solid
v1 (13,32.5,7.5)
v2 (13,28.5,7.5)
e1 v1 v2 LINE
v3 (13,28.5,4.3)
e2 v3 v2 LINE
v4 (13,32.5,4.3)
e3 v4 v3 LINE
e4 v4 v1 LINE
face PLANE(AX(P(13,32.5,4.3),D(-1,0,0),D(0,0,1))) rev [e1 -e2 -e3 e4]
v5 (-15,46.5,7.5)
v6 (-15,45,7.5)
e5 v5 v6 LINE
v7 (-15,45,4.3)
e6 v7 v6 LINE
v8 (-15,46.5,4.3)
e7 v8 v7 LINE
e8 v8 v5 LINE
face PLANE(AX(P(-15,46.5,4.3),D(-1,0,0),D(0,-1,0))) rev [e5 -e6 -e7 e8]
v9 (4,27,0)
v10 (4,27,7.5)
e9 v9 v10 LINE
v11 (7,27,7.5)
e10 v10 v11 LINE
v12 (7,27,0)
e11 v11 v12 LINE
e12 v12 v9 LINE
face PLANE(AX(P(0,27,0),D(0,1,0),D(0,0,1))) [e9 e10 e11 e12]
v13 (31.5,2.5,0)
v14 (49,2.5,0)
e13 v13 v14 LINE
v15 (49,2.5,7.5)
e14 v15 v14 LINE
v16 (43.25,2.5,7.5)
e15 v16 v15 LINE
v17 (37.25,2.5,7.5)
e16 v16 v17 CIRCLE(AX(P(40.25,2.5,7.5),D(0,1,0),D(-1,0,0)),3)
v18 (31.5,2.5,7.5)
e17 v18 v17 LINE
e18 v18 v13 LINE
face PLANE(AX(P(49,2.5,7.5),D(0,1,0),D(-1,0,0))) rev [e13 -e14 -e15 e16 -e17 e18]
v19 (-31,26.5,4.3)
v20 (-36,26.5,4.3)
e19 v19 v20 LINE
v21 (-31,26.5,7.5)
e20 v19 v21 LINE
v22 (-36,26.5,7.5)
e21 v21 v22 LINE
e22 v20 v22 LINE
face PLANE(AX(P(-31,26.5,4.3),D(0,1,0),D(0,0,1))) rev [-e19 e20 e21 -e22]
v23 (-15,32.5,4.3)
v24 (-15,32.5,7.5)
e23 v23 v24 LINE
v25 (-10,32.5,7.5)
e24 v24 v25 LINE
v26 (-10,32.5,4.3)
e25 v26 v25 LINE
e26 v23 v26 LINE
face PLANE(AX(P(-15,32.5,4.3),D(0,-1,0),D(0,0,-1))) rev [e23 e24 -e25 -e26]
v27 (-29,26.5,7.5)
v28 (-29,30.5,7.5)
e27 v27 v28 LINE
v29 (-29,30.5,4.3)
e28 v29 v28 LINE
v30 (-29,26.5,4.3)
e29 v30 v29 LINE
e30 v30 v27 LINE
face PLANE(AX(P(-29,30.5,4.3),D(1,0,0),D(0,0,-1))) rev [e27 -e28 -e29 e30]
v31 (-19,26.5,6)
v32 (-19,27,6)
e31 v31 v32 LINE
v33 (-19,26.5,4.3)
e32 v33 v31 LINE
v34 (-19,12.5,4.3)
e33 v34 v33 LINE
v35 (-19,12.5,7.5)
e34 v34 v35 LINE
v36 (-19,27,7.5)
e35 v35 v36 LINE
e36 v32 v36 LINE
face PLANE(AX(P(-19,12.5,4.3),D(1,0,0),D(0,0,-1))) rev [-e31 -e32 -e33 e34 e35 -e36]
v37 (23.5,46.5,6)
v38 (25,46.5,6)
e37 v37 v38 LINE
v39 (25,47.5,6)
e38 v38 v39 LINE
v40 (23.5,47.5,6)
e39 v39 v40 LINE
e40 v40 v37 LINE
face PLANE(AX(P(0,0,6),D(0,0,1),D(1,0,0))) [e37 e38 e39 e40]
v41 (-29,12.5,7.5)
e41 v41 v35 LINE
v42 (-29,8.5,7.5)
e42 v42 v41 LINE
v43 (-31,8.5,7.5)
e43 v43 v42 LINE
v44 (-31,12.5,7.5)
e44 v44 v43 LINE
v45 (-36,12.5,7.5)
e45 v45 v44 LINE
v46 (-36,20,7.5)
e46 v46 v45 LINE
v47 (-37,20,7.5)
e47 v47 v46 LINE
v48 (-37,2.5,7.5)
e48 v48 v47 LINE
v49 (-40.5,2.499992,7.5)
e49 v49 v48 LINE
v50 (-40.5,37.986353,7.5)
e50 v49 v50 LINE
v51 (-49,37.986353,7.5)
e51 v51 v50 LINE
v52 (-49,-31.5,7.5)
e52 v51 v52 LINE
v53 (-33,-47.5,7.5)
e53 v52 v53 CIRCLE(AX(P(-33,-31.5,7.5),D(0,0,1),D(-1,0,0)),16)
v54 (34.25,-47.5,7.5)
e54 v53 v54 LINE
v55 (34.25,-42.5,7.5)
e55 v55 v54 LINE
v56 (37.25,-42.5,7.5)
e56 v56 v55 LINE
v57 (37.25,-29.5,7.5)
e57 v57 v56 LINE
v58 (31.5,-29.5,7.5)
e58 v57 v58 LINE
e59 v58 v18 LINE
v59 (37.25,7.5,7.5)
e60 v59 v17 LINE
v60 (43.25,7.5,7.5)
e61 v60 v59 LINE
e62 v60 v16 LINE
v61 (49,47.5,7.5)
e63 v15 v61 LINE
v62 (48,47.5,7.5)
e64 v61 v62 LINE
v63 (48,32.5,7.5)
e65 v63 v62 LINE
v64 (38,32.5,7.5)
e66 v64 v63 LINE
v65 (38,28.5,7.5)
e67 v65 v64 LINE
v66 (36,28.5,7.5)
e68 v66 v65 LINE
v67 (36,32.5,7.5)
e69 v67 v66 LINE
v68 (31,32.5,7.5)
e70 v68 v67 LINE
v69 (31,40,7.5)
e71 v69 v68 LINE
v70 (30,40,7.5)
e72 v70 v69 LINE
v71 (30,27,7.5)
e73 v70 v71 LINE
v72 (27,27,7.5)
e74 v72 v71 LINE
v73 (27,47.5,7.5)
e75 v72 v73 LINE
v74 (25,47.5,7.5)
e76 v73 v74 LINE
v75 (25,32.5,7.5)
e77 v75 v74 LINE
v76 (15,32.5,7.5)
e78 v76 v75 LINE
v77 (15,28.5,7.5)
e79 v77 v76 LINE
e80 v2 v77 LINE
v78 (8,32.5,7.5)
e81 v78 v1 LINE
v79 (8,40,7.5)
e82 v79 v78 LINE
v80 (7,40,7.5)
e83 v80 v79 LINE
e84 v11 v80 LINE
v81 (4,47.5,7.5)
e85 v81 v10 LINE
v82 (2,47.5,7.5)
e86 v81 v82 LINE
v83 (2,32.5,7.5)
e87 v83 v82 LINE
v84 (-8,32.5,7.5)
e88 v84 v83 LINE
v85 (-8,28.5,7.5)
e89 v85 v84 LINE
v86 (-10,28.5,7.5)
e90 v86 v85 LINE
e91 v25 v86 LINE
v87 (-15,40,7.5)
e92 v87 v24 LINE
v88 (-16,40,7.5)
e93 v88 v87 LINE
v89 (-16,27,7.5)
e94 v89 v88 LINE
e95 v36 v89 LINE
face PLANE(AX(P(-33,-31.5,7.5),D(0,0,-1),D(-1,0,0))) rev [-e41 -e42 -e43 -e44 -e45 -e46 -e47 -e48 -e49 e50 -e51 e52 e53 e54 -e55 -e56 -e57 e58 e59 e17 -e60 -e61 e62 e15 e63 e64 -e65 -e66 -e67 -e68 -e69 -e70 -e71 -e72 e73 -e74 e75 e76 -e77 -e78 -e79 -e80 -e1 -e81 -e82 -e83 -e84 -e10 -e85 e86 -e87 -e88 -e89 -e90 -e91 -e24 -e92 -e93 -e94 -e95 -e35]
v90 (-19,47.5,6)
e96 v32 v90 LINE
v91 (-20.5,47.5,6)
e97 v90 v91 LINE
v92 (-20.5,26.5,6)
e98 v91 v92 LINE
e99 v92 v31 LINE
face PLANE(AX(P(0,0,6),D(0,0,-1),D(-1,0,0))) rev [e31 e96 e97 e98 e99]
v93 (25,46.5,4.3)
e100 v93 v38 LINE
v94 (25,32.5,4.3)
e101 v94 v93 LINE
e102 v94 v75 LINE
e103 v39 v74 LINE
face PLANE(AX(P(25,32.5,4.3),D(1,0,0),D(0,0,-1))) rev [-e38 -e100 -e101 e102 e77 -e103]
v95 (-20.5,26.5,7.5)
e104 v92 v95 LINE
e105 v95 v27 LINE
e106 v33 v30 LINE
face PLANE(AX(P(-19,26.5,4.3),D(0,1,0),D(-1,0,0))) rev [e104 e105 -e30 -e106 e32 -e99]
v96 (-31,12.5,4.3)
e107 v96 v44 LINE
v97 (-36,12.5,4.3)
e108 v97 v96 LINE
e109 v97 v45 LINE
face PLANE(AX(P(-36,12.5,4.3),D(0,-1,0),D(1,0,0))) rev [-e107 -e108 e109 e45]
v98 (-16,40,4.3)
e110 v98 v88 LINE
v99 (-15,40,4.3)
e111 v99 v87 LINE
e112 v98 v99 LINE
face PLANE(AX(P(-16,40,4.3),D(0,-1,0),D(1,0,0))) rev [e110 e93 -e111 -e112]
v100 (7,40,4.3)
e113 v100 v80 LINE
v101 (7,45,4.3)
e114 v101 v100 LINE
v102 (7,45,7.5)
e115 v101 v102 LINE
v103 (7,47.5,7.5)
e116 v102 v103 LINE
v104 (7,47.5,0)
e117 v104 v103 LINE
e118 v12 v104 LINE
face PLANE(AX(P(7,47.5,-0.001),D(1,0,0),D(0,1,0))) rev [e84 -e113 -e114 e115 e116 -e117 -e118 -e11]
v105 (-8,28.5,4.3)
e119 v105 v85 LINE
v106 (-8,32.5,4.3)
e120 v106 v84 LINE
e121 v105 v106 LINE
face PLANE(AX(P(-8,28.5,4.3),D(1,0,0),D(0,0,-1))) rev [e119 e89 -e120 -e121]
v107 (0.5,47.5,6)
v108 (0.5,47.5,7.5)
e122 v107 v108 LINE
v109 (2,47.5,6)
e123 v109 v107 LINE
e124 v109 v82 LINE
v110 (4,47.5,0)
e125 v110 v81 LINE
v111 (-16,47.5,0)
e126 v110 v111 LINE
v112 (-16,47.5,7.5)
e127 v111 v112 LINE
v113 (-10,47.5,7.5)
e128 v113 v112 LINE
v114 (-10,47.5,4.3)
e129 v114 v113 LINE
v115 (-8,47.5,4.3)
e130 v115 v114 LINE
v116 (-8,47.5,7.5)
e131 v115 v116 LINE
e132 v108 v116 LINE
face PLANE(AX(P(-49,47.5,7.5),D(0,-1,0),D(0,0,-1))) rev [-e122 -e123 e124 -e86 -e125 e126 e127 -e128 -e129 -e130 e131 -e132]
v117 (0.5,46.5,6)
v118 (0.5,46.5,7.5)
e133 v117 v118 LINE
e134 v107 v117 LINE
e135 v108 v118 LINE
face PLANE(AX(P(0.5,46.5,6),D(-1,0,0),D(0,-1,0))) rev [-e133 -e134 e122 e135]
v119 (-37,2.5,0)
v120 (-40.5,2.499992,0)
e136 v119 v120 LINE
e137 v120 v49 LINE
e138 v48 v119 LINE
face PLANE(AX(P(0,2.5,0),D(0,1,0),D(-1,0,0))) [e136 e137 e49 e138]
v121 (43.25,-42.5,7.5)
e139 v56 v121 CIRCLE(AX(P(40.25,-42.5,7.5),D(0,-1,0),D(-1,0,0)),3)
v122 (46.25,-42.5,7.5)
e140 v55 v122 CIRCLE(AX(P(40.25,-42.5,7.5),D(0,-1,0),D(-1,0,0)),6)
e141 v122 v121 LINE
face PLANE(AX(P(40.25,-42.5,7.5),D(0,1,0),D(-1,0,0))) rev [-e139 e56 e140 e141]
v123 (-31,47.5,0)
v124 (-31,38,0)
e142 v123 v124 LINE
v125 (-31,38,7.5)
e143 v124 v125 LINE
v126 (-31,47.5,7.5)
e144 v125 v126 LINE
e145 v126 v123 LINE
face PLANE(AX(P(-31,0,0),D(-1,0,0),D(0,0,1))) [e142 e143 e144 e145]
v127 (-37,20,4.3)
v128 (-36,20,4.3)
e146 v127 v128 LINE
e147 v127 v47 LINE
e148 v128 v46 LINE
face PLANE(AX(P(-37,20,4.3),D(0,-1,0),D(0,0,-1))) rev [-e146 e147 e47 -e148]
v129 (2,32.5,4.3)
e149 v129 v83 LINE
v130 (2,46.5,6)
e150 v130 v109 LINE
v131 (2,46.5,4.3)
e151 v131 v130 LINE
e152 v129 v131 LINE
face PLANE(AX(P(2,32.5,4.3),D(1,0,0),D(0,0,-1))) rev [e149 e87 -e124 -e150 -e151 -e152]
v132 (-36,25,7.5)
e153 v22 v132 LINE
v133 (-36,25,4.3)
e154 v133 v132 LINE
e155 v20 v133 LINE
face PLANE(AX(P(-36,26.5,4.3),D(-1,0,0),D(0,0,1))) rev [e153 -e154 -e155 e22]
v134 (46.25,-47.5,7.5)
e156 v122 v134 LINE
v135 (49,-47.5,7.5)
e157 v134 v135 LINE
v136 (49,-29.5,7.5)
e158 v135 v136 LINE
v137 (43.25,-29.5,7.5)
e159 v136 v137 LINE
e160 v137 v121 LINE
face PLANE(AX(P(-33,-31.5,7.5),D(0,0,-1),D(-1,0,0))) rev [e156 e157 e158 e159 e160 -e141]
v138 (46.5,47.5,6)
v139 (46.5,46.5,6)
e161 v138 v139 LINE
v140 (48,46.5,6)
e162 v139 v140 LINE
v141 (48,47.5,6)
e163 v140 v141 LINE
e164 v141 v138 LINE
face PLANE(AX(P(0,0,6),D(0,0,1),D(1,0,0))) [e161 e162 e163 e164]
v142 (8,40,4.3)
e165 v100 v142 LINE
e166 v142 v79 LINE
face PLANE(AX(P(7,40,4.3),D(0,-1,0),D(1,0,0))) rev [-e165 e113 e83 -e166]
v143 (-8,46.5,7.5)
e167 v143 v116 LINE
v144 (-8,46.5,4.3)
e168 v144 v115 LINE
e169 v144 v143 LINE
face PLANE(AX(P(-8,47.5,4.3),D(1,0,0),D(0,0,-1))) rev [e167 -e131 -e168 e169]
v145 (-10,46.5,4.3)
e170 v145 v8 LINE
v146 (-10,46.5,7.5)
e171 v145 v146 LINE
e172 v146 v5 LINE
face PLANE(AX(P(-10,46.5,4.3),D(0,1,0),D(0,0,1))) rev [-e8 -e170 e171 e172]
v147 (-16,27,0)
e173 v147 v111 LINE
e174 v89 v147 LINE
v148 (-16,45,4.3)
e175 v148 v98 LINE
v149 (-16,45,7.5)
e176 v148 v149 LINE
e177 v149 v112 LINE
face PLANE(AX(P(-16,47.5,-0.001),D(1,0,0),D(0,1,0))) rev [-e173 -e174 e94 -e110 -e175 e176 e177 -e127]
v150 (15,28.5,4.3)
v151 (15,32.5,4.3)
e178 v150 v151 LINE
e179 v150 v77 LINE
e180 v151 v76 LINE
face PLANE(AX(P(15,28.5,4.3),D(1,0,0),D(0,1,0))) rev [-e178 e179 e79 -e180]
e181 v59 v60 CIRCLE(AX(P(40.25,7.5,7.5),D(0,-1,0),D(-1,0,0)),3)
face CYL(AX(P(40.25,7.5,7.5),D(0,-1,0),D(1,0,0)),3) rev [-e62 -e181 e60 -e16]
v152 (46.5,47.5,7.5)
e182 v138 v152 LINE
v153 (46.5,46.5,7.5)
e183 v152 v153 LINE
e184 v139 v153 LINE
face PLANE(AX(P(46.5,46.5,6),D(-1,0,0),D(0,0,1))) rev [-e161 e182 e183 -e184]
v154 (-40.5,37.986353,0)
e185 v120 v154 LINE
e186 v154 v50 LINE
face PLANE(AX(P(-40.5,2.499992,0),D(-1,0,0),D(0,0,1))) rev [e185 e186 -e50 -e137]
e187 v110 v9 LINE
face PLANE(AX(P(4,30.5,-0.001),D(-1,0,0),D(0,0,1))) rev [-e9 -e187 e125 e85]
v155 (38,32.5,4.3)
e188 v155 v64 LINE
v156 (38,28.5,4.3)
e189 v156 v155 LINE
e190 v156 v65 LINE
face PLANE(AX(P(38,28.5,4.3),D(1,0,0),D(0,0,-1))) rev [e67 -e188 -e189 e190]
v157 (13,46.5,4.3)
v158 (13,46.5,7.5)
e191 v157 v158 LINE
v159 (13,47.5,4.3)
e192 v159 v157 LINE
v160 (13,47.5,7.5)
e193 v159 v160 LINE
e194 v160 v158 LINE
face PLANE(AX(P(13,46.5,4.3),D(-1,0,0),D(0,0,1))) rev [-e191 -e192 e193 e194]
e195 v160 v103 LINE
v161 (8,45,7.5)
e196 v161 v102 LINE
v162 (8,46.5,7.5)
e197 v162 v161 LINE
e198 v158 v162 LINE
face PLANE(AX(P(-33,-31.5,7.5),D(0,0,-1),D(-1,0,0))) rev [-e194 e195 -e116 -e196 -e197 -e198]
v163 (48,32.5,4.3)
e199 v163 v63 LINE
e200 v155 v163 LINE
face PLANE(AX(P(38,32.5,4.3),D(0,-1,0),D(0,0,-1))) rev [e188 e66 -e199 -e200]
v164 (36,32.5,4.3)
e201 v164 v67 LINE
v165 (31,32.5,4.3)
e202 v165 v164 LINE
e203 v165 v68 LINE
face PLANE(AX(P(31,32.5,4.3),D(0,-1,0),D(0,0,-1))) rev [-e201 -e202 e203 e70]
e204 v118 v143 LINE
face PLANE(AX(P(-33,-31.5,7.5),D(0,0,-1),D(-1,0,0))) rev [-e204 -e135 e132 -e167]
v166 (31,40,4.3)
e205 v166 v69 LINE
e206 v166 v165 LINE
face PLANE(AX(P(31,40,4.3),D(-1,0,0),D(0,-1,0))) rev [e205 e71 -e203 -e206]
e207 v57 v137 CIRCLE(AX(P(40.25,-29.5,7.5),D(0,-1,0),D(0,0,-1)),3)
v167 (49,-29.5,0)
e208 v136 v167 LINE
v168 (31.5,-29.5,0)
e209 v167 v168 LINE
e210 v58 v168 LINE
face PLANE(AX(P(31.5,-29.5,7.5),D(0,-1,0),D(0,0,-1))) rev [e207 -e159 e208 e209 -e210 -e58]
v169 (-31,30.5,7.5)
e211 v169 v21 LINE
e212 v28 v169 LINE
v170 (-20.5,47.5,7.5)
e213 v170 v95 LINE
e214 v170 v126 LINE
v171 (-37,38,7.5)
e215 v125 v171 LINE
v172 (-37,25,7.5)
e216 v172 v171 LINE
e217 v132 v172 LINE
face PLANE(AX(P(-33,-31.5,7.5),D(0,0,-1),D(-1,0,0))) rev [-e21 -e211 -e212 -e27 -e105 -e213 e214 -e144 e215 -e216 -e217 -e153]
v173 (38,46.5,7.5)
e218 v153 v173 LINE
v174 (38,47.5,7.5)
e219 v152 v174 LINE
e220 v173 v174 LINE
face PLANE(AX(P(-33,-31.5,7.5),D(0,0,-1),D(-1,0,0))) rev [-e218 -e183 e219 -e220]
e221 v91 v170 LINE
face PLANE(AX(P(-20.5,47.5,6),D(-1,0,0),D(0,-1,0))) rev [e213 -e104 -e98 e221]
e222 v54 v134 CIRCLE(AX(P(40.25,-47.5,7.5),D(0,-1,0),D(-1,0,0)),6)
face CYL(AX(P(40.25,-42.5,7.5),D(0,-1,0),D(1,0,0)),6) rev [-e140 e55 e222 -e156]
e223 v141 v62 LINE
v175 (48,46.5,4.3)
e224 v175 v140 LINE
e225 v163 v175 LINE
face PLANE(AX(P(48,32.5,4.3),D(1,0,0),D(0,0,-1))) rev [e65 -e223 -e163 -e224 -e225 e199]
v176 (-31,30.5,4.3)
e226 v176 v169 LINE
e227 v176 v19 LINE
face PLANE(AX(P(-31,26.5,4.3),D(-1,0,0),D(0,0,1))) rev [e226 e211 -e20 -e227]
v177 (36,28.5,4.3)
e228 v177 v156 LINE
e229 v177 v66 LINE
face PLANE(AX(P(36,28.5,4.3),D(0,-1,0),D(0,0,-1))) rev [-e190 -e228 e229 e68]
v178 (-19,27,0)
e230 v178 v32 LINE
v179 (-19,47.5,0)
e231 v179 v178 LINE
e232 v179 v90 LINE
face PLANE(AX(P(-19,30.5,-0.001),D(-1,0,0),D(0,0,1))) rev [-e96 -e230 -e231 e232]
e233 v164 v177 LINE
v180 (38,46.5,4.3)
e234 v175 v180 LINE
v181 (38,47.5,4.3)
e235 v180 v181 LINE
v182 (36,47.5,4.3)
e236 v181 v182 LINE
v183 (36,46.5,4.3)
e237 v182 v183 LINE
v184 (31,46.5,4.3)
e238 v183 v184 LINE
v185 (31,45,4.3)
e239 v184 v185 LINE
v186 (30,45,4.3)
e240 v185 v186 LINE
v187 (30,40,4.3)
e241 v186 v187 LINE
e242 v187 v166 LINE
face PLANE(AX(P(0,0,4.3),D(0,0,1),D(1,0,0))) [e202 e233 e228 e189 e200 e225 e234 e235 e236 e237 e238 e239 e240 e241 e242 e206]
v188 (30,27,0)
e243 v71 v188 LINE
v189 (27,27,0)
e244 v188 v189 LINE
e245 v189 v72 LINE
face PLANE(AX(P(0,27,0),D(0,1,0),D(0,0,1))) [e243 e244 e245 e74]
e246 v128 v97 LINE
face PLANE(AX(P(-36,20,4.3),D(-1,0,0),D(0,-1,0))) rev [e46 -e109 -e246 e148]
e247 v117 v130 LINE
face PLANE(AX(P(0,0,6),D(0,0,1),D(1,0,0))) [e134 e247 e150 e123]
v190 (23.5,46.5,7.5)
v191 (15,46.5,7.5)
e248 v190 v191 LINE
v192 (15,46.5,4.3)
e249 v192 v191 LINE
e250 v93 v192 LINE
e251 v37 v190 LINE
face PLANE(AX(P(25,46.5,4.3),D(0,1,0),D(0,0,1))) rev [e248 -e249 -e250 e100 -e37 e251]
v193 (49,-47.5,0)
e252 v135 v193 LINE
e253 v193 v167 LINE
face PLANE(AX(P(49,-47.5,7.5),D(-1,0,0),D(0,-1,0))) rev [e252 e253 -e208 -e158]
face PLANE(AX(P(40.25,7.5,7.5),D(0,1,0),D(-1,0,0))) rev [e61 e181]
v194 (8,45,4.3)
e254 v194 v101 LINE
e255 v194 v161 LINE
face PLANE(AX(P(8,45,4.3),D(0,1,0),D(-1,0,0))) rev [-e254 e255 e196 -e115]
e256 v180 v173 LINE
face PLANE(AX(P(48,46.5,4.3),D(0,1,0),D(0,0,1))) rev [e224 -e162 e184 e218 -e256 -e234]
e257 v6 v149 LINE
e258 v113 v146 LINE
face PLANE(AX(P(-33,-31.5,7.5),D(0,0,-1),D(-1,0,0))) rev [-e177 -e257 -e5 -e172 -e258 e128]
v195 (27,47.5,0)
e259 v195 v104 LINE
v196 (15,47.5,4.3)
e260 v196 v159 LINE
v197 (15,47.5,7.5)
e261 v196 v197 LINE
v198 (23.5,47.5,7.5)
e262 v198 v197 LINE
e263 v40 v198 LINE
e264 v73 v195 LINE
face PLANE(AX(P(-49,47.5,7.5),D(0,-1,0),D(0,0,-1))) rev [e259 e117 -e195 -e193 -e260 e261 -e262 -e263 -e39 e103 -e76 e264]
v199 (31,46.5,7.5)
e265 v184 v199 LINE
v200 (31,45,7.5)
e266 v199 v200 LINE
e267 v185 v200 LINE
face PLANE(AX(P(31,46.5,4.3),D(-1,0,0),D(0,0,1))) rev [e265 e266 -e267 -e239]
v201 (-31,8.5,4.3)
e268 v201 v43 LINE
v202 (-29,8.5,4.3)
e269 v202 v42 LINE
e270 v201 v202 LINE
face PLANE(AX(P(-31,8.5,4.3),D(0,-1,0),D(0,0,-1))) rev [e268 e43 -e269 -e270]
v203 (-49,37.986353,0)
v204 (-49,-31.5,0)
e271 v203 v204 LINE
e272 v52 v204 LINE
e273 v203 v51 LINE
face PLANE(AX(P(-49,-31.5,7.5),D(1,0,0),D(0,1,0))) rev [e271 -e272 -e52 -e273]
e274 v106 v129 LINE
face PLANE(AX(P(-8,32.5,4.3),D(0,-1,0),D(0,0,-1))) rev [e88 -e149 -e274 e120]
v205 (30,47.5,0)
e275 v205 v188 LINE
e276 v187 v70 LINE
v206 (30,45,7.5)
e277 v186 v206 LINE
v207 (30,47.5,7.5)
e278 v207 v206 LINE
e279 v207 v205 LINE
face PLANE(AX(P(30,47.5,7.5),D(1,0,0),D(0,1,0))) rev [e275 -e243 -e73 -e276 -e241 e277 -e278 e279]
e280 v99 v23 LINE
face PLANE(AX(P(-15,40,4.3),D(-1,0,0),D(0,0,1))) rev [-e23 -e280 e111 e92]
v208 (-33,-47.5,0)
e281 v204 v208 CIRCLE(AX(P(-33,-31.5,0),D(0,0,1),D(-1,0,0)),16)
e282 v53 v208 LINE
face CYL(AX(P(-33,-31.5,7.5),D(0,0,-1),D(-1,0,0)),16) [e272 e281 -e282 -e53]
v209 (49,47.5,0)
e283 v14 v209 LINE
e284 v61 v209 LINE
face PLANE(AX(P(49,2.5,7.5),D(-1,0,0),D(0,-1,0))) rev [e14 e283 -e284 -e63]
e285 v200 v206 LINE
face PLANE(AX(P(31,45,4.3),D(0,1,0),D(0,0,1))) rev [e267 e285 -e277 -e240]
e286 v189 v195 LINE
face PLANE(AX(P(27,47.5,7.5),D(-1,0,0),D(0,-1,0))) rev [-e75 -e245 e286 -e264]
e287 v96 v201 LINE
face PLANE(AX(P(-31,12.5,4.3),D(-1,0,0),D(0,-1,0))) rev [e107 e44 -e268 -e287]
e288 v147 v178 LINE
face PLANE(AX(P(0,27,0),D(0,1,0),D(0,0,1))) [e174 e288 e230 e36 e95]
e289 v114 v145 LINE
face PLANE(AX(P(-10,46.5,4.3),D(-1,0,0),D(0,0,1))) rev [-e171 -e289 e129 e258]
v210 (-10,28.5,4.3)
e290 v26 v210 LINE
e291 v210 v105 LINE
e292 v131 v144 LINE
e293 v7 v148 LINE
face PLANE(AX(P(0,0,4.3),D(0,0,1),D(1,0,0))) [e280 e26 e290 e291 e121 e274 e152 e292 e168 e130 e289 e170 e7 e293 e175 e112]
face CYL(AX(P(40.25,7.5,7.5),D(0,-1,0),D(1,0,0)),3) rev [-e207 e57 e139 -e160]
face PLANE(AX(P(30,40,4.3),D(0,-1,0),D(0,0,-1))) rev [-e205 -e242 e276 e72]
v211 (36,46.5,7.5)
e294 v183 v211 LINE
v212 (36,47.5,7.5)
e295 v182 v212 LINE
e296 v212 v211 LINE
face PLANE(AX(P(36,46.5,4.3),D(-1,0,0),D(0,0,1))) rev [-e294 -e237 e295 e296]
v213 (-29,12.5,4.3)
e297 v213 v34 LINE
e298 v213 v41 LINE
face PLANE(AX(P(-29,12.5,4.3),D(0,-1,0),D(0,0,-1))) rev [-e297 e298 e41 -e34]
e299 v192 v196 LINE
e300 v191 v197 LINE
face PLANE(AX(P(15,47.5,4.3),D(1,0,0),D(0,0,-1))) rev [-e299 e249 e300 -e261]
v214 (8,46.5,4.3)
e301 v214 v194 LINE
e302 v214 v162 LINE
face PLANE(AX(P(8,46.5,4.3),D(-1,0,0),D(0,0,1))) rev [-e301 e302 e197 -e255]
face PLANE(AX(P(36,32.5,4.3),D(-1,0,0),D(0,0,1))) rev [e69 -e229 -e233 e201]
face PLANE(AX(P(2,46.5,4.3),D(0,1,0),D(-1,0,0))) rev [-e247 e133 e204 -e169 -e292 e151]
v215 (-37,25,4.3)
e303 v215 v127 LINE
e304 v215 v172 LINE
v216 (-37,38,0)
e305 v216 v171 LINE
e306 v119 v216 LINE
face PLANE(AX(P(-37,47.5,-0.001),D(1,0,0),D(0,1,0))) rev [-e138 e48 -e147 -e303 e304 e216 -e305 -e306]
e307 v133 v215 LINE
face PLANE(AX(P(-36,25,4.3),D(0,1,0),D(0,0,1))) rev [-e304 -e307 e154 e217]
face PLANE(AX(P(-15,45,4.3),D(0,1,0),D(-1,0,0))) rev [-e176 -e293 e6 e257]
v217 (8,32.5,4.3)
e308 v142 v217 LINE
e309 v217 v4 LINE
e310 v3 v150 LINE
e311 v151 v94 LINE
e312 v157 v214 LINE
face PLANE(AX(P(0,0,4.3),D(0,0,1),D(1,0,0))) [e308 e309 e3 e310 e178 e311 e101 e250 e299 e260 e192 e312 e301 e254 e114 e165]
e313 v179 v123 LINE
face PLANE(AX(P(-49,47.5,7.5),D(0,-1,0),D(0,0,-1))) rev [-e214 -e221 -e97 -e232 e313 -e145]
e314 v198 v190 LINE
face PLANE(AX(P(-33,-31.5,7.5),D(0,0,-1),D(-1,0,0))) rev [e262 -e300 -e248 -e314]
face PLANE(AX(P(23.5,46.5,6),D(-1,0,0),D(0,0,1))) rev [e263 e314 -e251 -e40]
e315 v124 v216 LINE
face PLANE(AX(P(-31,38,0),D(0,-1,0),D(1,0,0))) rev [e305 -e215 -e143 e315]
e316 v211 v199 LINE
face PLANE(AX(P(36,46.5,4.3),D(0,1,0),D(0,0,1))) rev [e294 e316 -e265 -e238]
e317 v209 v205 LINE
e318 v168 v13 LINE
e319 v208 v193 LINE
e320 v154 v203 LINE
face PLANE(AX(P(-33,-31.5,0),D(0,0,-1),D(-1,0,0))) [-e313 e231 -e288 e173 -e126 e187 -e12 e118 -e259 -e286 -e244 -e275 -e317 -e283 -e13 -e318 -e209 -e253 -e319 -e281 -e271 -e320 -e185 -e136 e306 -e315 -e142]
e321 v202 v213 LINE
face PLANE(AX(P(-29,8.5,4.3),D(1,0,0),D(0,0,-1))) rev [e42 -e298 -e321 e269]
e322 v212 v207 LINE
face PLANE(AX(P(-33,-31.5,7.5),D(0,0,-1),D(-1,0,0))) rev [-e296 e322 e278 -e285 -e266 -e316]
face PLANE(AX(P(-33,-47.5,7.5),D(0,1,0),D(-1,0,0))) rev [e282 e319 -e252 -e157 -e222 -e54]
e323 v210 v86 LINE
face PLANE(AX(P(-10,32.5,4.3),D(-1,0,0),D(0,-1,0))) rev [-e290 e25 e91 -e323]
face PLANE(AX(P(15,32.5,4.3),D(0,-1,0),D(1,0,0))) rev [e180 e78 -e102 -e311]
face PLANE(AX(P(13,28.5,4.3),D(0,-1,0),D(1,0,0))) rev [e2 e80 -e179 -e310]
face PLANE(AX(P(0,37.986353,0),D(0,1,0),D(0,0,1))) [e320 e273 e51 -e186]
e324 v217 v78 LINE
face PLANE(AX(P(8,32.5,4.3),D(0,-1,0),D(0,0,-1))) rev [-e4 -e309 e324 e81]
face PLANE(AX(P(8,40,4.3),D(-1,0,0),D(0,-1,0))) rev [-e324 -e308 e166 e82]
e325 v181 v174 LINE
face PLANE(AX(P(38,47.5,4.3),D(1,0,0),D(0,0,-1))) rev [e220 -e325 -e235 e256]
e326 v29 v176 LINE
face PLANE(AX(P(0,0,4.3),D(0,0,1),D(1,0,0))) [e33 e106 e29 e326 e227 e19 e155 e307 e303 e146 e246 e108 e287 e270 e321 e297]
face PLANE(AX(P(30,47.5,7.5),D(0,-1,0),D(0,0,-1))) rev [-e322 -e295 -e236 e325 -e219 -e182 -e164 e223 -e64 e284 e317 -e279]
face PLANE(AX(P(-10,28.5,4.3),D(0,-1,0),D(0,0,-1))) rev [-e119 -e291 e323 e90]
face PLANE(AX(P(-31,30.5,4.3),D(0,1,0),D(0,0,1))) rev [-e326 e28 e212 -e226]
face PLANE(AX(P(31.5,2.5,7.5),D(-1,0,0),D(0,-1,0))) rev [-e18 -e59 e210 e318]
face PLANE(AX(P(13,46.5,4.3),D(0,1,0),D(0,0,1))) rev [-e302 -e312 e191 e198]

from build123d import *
from OCP.BRepAlgoAPI import BRepAlgoAPI_Cut
from OCP.TopTools import TopTools_ListOfShape

# Parameters (mm, degrees)
BOSS_EXTRUDE1_DEPTH = 7.5
CUT_EXTRUDE1_DEPTH  = 3.2
CUT_EXTRUDE2_DEPTH  = 5
CUT_EXTRUDE3_DEPTH  = 50
CUT_EXTRUDE4_REACH  = 70.655
SKETCH5_W           = 3
SKETCH5_H           = 17
CUT_EXTRUDE5_REACH  = 70.655
SKETCH8_W           = 12
SKETCH8_H           = 37
CUT_EXTRUDE6_DEPTH  = 3.2
SKETCH10_W          = 10
SKETCH10_H          = 7.5
BOSS_EXTRUDE2_DEPTH = 27.486353186
SKETCH11_W          = 3
SKETCH11_H          = 7.5
CUT_EXTRUDE7_DEPTH  = 3.5
SKETCH12_W          = 2
SKETCH12_H          = 7.5
CUT_EXTRUDE8_DEPTH  = 4
SKETCH13_W          = 2
SKETCH13_H          = 7.5
CUT_EXTRUDE9_DEPTH  = 4
SKETCH14_W          = 7.5
SKETCH14_H          = 9.5
CUT_EXTRUDE10_DEPTH = 6
SKETCH15_W          = 1.5
SKETCH15_H          = 21
SKETCH15_H_2        = 1
CUT_EXTRUDE11_DEPTH = 1.5
SKETCH16_W          = 1.5
SKETCH16_H          = 7.5
CUT_EXTRUDE12_DEPTH = 35.486360958


with BuildPart() as part:
    # Sketch1 → Boss-Extrude1 (new body)
    with BuildSketch(Plane.XY):
        with BuildLine():
            Line((-33, -47.5), (49, -47.5))
            Line((49, -47.5), (49, -29.5))
            Line((49, -29.5), (31.5, -29.5))
            Line((31.5, -29.5), (31.5, 2.5))
            Line((31.5, 2.5), (49, 2.5))
            Line((49, 2.5), (49, 47.5))
            Line((49, 47.5), (30, 47.5))
            Line((30, 47.5), (30, 30.5))
            Line((30, 30.5), (27, 30.5))
            Line((27, 30.5), (27, 47.5))
            Line((27, 47.5), (-49, 47.5))
            Line((-49, 47.5), (-49, -31.5))
            ThreePointArc((-49, -31.5), (-44.313708499, -42.813708499), (-33, -47.5))
        make_face()
    extrude(amount=BOSS_EXTRUDE1_DEPTH)

    # Sketch2 → Cut-Extrude1 (cut)
    with BuildSketch(Plane.XY.offset(7.5)):
        Polygon((30, 40), (31, 40), (31, 32.5), (36, 32.5), (36, 28.5), (38, 28.5), (38, 32.5), (48, 32.5), (48, 46.5), (38, 46.5), (38, 47.5), (36, 47.5), (36, 46.5), (31, 46.5), (31, 45), (30, 45), align=None)
        Polygon((-16, 40), (-15, 40), (-15, 32.5), (-10, 32.5), (-10, 28.5), (-8, 28.5), (-8, 32.5), (2, 32.5), (2, 46.5), (-8, 46.5), (-8, 47.5), (-10, 47.5), (-10, 46.5), (-15, 46.5), (-15, 45), (-16, 45), align=None)
        Polygon((7, 40), (8, 40), (8, 32.5), (13, 32.5), (13, 28.5), (15, 28.5), (15, 32.5), (25, 32.5), (25, 46.5), (15, 46.5), (15, 47.5), (13, 47.5), (13, 46.5), (8, 46.5), (8, 45), (7, 45), align=None)
    extrude(amount=-CUT_EXTRUDE1_DEPTH, mode=Mode.SUBTRACT)

    # Sketch3 → Cut-Extrude2 (cut)
    with BuildSketch(Plane.XZ.offset(47.5)):
        with BuildLine():
            Line((34.25, 7.5), (46.25, 7.5))
            ThreePointArc((46.25, 7.5), (40.25, 1.5), (34.25, 7.5))
        make_face()
    extrude(amount=-CUT_EXTRUDE2_DEPTH, mode=Mode.SUBTRACT)

    # Sketch4 → Cut-Extrude3 (cut)
    with BuildSketch(Plane.XZ.offset(42.5)):
        with BuildLine():
            Line((37.25, 7.5), (43.25, 7.5))
            ThreePointArc((43.25, 7.5), (40.25, 4.5), (37.25, 7.5))
        make_face()
    extrude(amount=-CUT_EXTRUDE3_DEPTH, mode=Mode.SUBTRACT)

    # Sketch5 → Cut-Extrude4 (cut, up to next)
    with BuildSketch(Plane.XY.offset(7.5), mode=Mode.PRIVATE) as cut_extrude4_sk1:
        with Locations((5.5, 39)):
            Rectangle(SKETCH5_W, SKETCH5_H)
    cut_extrude4_tool1 = extrude(cut_extrude4_sk1.sketch, amount=-CUT_EXTRUDE4_REACH, mode=Mode.PRIVATE) & part.part
    # Sketch5 → Cut-Extrude4 (cut, up to next)
    with BuildSketch(Plane.XY.offset(7.5), mode=Mode.PRIVATE) as cut_extrude4_sk2:
        with Locations((-17.5, 39)):
            Rectangle(SKETCH5_W, SKETCH5_H)
    cut_extrude4_tool2 = extrude(cut_extrude4_sk2.sketch, amount=-CUT_EXTRUDE4_REACH, mode=Mode.PRIVATE) & part.part
    add(cut_extrude4_tool1.solids().sort_by_distance((5.5, 39, 7.5))[0], mode=Mode.SUBTRACT)
    add(cut_extrude4_tool2.solids().sort_by_distance((-17.5, 39, 7.5))[0], mode=Mode.SUBTRACT)

    # Sketch8 → Cut-Extrude5 (cut, up to next)
    with BuildSketch(Plane.XY.offset(7.5), mode=Mode.PRIVATE) as cut_extrude5_sk1:
        with Locations((-43, 29)):
            Rectangle(SKETCH8_W, SKETCH8_H)
    cut_extrude5_tool1 = extrude(cut_extrude5_sk1.sketch, amount=-CUT_EXTRUDE5_REACH, mode=Mode.PRIVATE) & part.part
    add(cut_extrude5_tool1.solids().sort_by_distance((-43, 29, 7.5))[0], mode=Mode.SUBTRACT)

    # Sketch9 → Cut-Extrude6 (cut)
    with BuildSketch(Plane.XY.offset(7.5)):
        Polygon((-37, 20), (-36, 20), (-36, 12.5), (-31, 12.5), (-31, 8.5), (-29, 8.5), (-29, 12.5), (-19, 12.5), (-19, 26.5), (-29, 26.5), (-29, 30.5), (-31, 30.5), (-31, 26.5), (-36, 26.5), (-36, 25), (-37, 25), align=None)
    extrude(amount=-CUT_EXTRUDE6_DEPTH, mode=Mode.SUBTRACT)

    # Sketch10 → Boss-Extrude2 (add)
    with BuildSketch(Plane(origin=(0, 10.5, 0), x_dir=(1, 0, 0), z_dir=(0, 1, 0))):
        with Locations((-44, -3.75)):
            Rectangle(SKETCH10_W, SKETCH10_H)
    extrude(amount=BOSS_EXTRUDE2_DEPTH)

    # Sketch11 → Cut-Extrude7 (cut)
    with BuildSketch(Plane(origin=(0, 30.5, 0), x_dir=(1, 0, 0), z_dir=(0, 1, 0))):
        with Locations((-17.5, -3.75)):
            Rectangle(SKETCH11_W, SKETCH11_H)
        with Locations((5.5, -3.75)):
            Rectangle(SKETCH11_W, SKETCH11_H)
        with Locations((28.5, -3.75)):
            Rectangle(SKETCH11_W, SKETCH11_H)
    extrude(amount=-CUT_EXTRUDE7_DEPTH, mode=Mode.SUBTRACT)

    # Sketch12 → Cut-Extrude8 (cut)
    with BuildSketch(Plane(origin=(0, 10.5, 0), x_dir=(1, 0, 0), z_dir=(0, 1, 0))):
        with Locations((-38, -3.75)):
            Rectangle(SKETCH12_W, SKETCH12_H)
    extrude(amount=-CUT_EXTRUDE8_DEPTH, mode=Mode.SUBTRACT)

    # Sketch13 → Cut-Extrude9 (cut)
    with BuildSketch(Plane(origin=(0, 6.5, 0), x_dir=(1, 0, 0), z_dir=(0, 1, 0))):
        with Locations((-38, -3.75)):
            Rectangle(SKETCH13_W, SKETCH13_H)
    extrude(amount=-CUT_EXTRUDE9_DEPTH, mode=Mode.SUBTRACT)

    # Sketch14 → Cut-Extrude10 (cut)
    with BuildSketch(Plane.ZY.offset(37)):
        with Locations((3.75, 42.75)):
            Rectangle(SKETCH14_W, SKETCH14_H)
    extrude(amount=-CUT_EXTRUDE10_DEPTH, mode=Mode.SUBTRACT)

    # Sketch15 → Cut-Extrude11 (cut)
    with BuildSketch(Plane.XY.offset(7.5)):
        with Locations((-19.75, 37)):
            Rectangle(SKETCH15_W, SKETCH15_H)
        with Locations((1.25, 47)):
            Rectangle(SKETCH15_W, SKETCH15_H_2)
        with Locations((24.25, 47)):
            Rectangle(SKETCH15_W, SKETCH15_H_2)
        with Locations((47.25, 47)):
            Rectangle(SKETCH15_W, SKETCH15_H_2)
    extrude(amount=-CUT_EXTRUDE11_DEPTH, mode=Mode.SUBTRACT)


with BuildPart() as cut_extrude12_tool:
    # Sketch16 → Cut-Extrude12 (new body)
    with BuildSketch(Plane(origin=(0, 37.986353186, 0), x_dir=(1, 0, 0), z_dir=(0, 1, 0))):
        with Locations((-39.75, -3.75)):
            Rectangle(SKETCH16_W, SKETCH16_H)
    extrude(amount=-CUT_EXTRUDE12_DEPTH)


with BuildPart() as part_1:
    add(part.part)

    # Cut-Extrude12: cut by cut_extrude12_tool, with a tolerance
    cut_extrude12_stock = TopTools_ListOfShape()
    cut_extrude12_stock.Append(part_1.part.wrapped)
    cut_extrude12_tools = TopTools_ListOfShape()
    cut_extrude12_tools.Append(cut_extrude12_tool.part.wrapped)
    cut_extrude12_cut = BRepAlgoAPI_Cut()
    cut_extrude12_cut.SetArguments(cut_extrude12_stock)
    cut_extrude12_cut.SetTools(cut_extrude12_tools)
    cut_extrude12_cut.SetFuzzyValue(0.00001)
    cut_extrude12_cut.Build()
    add(Compound.cast(cut_extrude12_cut.Shape()).solids(), mode=Mode.REPLACE)


solid = part_1.part
